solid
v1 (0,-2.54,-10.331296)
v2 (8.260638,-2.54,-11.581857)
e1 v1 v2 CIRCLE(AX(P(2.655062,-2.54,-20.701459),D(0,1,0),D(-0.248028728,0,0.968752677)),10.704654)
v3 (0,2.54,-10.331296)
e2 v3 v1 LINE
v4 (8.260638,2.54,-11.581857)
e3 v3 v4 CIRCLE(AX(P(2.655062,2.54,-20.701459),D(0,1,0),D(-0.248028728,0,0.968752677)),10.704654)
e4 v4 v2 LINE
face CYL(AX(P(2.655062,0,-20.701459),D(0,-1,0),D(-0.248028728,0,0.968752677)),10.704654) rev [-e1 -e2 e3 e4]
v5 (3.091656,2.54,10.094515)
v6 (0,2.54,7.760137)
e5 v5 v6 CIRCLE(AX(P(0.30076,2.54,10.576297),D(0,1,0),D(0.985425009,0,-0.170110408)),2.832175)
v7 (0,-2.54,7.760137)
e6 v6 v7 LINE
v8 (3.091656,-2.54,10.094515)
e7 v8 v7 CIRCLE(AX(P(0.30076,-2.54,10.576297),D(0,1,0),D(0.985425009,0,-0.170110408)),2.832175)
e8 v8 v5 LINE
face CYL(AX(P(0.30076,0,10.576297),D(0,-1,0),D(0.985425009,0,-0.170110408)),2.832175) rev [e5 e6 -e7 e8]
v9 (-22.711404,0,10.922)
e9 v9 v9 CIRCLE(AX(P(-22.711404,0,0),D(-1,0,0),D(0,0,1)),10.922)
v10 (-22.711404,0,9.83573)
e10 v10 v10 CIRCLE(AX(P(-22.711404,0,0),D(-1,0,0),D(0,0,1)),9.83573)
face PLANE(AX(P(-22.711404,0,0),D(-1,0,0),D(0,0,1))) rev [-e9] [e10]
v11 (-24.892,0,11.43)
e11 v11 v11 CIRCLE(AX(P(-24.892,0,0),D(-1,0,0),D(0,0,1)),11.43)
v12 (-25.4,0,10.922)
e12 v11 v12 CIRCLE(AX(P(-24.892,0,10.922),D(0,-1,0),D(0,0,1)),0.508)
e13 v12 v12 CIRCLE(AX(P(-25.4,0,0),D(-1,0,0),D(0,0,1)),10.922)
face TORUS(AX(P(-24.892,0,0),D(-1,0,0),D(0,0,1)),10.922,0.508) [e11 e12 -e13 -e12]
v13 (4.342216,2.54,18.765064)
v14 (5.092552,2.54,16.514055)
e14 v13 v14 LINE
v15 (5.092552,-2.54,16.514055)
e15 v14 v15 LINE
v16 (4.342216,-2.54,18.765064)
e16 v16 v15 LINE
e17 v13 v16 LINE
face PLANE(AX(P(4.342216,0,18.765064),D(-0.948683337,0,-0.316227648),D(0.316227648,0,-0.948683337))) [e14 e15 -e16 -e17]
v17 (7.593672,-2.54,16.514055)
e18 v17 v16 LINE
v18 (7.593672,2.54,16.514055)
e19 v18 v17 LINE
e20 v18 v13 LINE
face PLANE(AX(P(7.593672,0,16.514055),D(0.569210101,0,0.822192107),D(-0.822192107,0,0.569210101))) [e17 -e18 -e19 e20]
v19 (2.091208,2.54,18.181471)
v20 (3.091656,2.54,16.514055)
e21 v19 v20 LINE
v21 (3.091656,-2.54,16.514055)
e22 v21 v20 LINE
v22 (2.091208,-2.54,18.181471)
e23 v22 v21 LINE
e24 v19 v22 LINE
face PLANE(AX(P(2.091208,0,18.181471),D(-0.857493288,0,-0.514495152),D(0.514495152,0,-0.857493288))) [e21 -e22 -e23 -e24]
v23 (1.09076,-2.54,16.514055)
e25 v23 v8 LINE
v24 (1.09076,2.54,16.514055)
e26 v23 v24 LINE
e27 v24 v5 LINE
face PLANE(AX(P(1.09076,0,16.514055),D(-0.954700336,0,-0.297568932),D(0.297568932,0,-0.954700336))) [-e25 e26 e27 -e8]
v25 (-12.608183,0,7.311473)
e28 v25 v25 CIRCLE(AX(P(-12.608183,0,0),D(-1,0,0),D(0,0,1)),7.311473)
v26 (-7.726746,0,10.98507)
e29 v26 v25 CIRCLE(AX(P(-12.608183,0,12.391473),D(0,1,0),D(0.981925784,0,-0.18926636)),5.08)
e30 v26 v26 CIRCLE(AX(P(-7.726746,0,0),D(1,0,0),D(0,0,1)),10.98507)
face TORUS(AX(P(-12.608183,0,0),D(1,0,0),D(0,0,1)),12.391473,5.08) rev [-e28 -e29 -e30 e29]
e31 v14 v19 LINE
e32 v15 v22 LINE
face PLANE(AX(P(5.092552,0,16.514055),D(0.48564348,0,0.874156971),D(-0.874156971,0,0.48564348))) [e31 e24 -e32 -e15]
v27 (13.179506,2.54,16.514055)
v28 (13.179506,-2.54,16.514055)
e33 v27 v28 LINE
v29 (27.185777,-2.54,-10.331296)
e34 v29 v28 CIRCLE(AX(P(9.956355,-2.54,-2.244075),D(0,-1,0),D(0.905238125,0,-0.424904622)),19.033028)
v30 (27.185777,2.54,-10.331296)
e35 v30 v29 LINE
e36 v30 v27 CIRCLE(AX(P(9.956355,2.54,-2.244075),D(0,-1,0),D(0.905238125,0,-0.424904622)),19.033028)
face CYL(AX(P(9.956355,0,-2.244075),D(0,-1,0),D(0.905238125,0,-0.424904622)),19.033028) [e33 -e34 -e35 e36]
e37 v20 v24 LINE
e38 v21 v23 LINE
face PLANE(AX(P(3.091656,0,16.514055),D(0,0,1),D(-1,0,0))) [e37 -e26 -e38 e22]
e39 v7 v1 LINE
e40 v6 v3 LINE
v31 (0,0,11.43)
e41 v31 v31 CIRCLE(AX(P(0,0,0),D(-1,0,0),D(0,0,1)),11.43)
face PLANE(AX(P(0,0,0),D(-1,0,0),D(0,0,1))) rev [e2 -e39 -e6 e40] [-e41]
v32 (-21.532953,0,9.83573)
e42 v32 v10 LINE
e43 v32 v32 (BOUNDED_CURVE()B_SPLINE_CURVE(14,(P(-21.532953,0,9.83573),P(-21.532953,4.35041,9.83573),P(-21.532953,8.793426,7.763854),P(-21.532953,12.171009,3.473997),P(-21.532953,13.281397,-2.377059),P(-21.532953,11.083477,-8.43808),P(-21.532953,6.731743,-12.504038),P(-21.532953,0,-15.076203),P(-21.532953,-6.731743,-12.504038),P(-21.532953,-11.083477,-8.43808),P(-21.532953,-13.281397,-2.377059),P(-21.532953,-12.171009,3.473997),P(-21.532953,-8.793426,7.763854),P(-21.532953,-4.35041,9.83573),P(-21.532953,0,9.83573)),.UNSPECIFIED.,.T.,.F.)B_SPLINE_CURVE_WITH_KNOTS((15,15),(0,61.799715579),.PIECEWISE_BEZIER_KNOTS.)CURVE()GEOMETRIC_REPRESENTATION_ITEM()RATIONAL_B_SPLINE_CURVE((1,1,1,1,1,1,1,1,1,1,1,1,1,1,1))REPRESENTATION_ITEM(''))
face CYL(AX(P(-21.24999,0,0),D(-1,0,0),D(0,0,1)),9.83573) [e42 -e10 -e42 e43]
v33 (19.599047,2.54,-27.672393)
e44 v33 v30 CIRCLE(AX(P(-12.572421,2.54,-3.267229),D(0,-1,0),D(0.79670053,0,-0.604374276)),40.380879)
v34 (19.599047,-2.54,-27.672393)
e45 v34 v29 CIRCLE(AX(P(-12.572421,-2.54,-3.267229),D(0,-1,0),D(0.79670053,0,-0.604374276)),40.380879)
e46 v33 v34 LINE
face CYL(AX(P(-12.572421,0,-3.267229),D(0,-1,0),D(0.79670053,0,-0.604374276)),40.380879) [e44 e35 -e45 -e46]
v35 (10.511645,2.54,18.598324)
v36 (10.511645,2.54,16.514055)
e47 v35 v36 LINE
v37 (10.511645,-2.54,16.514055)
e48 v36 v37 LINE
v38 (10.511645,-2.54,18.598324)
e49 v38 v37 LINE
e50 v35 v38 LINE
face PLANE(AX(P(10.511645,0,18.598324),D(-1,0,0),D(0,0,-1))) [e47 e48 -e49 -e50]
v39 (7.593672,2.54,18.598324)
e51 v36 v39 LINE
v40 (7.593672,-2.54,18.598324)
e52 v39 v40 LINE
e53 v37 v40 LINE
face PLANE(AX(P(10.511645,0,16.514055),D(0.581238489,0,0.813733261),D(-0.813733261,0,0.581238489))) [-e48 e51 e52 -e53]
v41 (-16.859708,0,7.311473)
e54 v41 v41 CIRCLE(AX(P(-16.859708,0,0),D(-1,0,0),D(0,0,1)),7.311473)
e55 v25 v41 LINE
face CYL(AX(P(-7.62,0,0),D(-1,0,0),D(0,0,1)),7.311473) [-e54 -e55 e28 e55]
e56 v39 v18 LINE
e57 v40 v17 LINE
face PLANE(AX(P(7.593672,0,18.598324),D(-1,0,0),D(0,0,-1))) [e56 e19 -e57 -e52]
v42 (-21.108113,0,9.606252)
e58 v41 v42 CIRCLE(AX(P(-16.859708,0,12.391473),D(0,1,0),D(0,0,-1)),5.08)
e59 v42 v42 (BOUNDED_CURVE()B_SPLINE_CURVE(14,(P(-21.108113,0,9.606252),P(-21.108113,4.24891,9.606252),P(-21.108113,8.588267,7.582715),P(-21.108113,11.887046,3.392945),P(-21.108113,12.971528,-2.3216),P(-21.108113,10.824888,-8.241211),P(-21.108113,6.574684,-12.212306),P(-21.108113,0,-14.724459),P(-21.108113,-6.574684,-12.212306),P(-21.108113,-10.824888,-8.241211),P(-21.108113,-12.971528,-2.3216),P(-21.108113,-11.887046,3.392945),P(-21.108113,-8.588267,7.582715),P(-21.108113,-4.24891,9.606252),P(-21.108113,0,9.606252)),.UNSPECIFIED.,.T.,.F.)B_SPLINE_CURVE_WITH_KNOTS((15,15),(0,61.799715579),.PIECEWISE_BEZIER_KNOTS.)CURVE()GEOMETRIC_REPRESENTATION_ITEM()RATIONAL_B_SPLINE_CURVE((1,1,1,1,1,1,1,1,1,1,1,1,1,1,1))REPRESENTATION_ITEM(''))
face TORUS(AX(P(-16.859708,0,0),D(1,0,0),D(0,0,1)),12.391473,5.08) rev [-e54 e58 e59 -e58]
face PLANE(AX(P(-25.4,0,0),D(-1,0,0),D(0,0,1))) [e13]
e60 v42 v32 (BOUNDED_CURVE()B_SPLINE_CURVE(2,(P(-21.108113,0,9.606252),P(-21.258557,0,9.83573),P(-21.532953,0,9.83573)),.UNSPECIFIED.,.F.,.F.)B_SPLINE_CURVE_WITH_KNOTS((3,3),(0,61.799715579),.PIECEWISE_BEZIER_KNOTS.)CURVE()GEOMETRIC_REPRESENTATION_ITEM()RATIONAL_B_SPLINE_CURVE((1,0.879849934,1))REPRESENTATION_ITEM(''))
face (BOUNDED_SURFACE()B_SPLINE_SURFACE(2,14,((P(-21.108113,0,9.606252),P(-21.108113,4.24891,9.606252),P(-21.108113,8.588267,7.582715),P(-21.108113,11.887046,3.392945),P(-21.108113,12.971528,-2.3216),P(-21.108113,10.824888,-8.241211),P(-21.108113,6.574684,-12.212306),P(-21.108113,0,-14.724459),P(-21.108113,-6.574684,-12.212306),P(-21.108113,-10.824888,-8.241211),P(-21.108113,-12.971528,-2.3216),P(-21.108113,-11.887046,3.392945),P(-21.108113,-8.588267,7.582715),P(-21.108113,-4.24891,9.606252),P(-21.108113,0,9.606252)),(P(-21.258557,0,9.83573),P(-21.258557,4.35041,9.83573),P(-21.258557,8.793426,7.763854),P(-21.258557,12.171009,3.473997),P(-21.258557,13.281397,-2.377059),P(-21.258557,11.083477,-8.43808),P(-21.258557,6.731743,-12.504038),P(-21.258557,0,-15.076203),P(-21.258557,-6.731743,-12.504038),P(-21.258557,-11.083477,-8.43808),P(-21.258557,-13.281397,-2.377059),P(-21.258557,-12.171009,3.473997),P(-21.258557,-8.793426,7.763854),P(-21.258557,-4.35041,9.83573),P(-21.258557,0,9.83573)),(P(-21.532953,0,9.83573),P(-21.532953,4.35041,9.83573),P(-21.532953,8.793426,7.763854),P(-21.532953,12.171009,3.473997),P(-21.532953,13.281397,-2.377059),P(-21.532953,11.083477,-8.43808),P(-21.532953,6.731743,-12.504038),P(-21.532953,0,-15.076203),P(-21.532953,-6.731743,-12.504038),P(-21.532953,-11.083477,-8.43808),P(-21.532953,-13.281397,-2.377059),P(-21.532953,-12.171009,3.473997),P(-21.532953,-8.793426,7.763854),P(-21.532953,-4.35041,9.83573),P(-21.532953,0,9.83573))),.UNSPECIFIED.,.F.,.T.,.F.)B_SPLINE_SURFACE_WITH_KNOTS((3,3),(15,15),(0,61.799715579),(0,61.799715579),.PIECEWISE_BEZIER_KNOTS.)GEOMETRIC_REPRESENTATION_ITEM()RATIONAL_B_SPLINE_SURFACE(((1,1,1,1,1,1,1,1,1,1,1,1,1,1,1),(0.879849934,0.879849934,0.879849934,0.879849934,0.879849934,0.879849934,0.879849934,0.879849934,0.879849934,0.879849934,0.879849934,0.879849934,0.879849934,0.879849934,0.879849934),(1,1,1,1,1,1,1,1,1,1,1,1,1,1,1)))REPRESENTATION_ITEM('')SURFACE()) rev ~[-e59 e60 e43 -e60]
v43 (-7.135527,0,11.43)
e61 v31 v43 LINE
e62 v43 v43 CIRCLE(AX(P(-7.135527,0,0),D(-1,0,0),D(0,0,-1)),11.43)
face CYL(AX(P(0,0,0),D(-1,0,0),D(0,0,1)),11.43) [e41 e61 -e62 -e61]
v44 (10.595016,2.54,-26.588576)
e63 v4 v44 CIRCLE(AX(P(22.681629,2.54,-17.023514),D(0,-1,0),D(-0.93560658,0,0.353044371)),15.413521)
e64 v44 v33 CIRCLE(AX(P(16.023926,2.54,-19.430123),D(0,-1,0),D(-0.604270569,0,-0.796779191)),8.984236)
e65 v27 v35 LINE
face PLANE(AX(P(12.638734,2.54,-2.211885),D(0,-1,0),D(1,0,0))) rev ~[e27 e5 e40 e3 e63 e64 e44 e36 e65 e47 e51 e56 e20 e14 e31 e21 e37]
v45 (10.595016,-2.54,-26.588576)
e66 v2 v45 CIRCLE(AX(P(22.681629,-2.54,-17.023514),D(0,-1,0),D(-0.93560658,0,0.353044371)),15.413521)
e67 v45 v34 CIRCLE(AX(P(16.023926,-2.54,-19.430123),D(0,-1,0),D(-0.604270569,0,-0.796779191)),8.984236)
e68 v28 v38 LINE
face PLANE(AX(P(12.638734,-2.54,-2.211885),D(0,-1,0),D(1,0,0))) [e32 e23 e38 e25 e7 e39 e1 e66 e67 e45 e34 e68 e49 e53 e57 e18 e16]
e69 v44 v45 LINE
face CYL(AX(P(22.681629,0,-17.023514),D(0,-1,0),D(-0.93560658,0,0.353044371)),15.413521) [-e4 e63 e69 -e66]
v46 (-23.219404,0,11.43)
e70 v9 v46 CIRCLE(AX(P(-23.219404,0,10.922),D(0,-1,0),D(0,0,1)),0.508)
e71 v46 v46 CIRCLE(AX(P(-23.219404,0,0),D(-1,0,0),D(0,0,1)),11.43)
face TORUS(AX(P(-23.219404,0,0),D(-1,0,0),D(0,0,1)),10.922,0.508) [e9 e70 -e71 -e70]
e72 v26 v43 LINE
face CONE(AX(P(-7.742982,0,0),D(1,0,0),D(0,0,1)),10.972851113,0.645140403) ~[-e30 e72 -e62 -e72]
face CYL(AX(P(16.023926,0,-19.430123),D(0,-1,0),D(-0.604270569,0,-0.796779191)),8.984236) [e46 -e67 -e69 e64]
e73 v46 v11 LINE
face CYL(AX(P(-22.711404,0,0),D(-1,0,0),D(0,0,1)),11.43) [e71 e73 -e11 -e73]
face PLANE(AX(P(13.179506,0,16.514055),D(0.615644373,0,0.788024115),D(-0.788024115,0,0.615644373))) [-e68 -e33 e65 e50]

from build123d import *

# Parameters (mm, degrees)
F4_R     = 0.508
F7_DEPTH = 2.54


# Not quite as in the source:
# - a fillet or chamfer that OpenCascade refuses, or shapes differently, is made with other operations: its cross-section is extruded or revolved along the edge and cut away or added


with BuildPart() as f1:
    # F0 (on Front) → F1 (revolve)
    with BuildSketch(Plane.XZ):
        Polygon((-25.4, 0), (0, 0), (0, 11.43), (-7.62, 11.43), (-7.62, 7.3114731075), (-20.32, 7.3114731075), (-21.2499899719, 9.835730216), (-22.7114037935, 9.835730216), (-22.7114037935, 11.43), (-25.4, 11.43), align=None)
    revolve(axis=Axis((-12.7, 0, 0), (-1, 0, 0)))

    # F2: fillet of radius 5.08 on 1 edges, made by hand

    # F2_s1 → F2_t2 (revolve)
    with BuildSketch(Plane.XZ):
        with BuildLine():
            ThreePointArc((-16.8597077176, 7.3114731075), (-19.3918240371, 7.9875218198), (-21.2499899719, 9.835730216))
            Line((-21.2499899719, 9.835730216), (-20.32, 7.3114731075))
            Line((-20.32, 7.3114731075), (-16.8597077176, 7.3114731075))
        make_face()
    revolve(axis=Axis((-20.32, 0, 0), (-1, 0, 0)))

    # F3: fillet of radius 5.08 on 1 edges, made by hand

    # F3_s1 → F3_t2 (revolve)
    with BuildSketch(Plane.XZ):
        with BuildLine():
            ThreePointArc((-7.62, 11.43), (-9.3738270483, 8.4741600369), (-12.6081829822, 7.3114731075))
            Line((-12.6081829822, 7.3114731075), (-7.62, 7.3114731075))
            Line((-7.62, 7.3114731075), (-7.62, 11.43))
        make_face()
    revolve(axis=Axis((-7.62, 0, 0), (-1, 0, 0)))

    # F4
    f4_edges = [f1.edges().sort_by_distance(p)[0] for p in [
        (-21.24999, 0, -9.83573),
        (-22.711404, 0, -11.43),
        (-25.4, 0, -11.43),
    ]]
    fillet(f4_edges, radius=F4_R)

    # F5: chamfer of 0.508 on 1 edges, made by hand

    # F5_s1 → F5_t2 (revolve, cut)
    with BuildSketch(Plane.XZ):
        with BuildLine():
            Line((-7.7429817287, 10.9728511125), (-7.1192910196, 11.442218632))
            Line((-7.1192910196, 11.442218632), (-7.1192910196, 11.452378632))
            ThreePointArc((-7.1192910196, 11.452378632), (-7.3696455098, 11.44016), (-7.62, 11.44016))
            Line((-7.62, 11.44016), (-7.629976366, 11.4319229462))
            ThreePointArc((-7.629976366, 11.4319229462), (-7.6800748035, 11.2010835053), (-7.7527446032, 10.9756639192))
            Line((-7.7527446032, 10.9756639192), (-7.7429817287, 10.9728511125))
        make_face()
    revolve(axis=Axis((-7.62, 0, 0), (-1, 0, 0)), mode=Mode.SUBTRACT)

    # F6 (on Front) → F7 (join, symmetric)
    with BuildSketch(Plane.XZ):
        with BuildLine():
            ThreePointArc((3.0916559044, 10.094515048), (2.0073718485, 8.3160562532), (0, 7.7601373196))
            Line((0, 7.7601373196), (0, -10.331296362))
            ThreePointArc((0, -10.331296362), (4.2573596526, -10.1174017701), (8.2606375217, -11.5818567574))
            ThreePointArc((8.2606375217, -11.5818567574), (7.4512752544, -19.3926799341), (10.5950161815, -26.5885759145))
            ThreePointArc((10.5950161815, -26.5885759145), (14.9502413437, -28.3499722326), (19.5990465581, -27.6723932475))
            ThreePointArc((19.5990465581, -27.6723932475), (24.422816729, -19.452646971), (27.1857772022, -10.331296362))
            ThreePointArc((27.1857772022, -10.331296362), (26.8307486913, 6.5599572314), (13.1795061752, 16.5140554309))
            Line((13.1795061752, 16.5140554309), (10.5116451159, 18.5983236879))
            Line((10.5116451159, 18.5983236879), (10.5116451159, 16.5140554309))
            Line((10.5116451159, 16.5140554309), (7.5936717913, 18.5983236879))
            Line((7.5936717913, 18.5983236879), (7.5936717913, 16.5140554309))
            Line((7.5936717913, 16.5140554309), (4.342216067, 18.7650639564))
            Line((4.342216067, 18.7650639564), (5.0925519317, 16.5140554309))
            Line((5.0925519317, 16.5140554309), (2.0912080654, 18.1814711541))
            Line((2.0912080654, 18.1814711541), (3.0916559044, 16.5140554309))
            Line((3.0916559044, 16.5140554309), (1.0907602264, 16.5140554309))
            Line((1.0907602264, 16.5140554309), (3.0916559044, 10.094515048))
        make_face()
    extrude(amount=F7_DEPTH, both=True)


solid = f1.part
